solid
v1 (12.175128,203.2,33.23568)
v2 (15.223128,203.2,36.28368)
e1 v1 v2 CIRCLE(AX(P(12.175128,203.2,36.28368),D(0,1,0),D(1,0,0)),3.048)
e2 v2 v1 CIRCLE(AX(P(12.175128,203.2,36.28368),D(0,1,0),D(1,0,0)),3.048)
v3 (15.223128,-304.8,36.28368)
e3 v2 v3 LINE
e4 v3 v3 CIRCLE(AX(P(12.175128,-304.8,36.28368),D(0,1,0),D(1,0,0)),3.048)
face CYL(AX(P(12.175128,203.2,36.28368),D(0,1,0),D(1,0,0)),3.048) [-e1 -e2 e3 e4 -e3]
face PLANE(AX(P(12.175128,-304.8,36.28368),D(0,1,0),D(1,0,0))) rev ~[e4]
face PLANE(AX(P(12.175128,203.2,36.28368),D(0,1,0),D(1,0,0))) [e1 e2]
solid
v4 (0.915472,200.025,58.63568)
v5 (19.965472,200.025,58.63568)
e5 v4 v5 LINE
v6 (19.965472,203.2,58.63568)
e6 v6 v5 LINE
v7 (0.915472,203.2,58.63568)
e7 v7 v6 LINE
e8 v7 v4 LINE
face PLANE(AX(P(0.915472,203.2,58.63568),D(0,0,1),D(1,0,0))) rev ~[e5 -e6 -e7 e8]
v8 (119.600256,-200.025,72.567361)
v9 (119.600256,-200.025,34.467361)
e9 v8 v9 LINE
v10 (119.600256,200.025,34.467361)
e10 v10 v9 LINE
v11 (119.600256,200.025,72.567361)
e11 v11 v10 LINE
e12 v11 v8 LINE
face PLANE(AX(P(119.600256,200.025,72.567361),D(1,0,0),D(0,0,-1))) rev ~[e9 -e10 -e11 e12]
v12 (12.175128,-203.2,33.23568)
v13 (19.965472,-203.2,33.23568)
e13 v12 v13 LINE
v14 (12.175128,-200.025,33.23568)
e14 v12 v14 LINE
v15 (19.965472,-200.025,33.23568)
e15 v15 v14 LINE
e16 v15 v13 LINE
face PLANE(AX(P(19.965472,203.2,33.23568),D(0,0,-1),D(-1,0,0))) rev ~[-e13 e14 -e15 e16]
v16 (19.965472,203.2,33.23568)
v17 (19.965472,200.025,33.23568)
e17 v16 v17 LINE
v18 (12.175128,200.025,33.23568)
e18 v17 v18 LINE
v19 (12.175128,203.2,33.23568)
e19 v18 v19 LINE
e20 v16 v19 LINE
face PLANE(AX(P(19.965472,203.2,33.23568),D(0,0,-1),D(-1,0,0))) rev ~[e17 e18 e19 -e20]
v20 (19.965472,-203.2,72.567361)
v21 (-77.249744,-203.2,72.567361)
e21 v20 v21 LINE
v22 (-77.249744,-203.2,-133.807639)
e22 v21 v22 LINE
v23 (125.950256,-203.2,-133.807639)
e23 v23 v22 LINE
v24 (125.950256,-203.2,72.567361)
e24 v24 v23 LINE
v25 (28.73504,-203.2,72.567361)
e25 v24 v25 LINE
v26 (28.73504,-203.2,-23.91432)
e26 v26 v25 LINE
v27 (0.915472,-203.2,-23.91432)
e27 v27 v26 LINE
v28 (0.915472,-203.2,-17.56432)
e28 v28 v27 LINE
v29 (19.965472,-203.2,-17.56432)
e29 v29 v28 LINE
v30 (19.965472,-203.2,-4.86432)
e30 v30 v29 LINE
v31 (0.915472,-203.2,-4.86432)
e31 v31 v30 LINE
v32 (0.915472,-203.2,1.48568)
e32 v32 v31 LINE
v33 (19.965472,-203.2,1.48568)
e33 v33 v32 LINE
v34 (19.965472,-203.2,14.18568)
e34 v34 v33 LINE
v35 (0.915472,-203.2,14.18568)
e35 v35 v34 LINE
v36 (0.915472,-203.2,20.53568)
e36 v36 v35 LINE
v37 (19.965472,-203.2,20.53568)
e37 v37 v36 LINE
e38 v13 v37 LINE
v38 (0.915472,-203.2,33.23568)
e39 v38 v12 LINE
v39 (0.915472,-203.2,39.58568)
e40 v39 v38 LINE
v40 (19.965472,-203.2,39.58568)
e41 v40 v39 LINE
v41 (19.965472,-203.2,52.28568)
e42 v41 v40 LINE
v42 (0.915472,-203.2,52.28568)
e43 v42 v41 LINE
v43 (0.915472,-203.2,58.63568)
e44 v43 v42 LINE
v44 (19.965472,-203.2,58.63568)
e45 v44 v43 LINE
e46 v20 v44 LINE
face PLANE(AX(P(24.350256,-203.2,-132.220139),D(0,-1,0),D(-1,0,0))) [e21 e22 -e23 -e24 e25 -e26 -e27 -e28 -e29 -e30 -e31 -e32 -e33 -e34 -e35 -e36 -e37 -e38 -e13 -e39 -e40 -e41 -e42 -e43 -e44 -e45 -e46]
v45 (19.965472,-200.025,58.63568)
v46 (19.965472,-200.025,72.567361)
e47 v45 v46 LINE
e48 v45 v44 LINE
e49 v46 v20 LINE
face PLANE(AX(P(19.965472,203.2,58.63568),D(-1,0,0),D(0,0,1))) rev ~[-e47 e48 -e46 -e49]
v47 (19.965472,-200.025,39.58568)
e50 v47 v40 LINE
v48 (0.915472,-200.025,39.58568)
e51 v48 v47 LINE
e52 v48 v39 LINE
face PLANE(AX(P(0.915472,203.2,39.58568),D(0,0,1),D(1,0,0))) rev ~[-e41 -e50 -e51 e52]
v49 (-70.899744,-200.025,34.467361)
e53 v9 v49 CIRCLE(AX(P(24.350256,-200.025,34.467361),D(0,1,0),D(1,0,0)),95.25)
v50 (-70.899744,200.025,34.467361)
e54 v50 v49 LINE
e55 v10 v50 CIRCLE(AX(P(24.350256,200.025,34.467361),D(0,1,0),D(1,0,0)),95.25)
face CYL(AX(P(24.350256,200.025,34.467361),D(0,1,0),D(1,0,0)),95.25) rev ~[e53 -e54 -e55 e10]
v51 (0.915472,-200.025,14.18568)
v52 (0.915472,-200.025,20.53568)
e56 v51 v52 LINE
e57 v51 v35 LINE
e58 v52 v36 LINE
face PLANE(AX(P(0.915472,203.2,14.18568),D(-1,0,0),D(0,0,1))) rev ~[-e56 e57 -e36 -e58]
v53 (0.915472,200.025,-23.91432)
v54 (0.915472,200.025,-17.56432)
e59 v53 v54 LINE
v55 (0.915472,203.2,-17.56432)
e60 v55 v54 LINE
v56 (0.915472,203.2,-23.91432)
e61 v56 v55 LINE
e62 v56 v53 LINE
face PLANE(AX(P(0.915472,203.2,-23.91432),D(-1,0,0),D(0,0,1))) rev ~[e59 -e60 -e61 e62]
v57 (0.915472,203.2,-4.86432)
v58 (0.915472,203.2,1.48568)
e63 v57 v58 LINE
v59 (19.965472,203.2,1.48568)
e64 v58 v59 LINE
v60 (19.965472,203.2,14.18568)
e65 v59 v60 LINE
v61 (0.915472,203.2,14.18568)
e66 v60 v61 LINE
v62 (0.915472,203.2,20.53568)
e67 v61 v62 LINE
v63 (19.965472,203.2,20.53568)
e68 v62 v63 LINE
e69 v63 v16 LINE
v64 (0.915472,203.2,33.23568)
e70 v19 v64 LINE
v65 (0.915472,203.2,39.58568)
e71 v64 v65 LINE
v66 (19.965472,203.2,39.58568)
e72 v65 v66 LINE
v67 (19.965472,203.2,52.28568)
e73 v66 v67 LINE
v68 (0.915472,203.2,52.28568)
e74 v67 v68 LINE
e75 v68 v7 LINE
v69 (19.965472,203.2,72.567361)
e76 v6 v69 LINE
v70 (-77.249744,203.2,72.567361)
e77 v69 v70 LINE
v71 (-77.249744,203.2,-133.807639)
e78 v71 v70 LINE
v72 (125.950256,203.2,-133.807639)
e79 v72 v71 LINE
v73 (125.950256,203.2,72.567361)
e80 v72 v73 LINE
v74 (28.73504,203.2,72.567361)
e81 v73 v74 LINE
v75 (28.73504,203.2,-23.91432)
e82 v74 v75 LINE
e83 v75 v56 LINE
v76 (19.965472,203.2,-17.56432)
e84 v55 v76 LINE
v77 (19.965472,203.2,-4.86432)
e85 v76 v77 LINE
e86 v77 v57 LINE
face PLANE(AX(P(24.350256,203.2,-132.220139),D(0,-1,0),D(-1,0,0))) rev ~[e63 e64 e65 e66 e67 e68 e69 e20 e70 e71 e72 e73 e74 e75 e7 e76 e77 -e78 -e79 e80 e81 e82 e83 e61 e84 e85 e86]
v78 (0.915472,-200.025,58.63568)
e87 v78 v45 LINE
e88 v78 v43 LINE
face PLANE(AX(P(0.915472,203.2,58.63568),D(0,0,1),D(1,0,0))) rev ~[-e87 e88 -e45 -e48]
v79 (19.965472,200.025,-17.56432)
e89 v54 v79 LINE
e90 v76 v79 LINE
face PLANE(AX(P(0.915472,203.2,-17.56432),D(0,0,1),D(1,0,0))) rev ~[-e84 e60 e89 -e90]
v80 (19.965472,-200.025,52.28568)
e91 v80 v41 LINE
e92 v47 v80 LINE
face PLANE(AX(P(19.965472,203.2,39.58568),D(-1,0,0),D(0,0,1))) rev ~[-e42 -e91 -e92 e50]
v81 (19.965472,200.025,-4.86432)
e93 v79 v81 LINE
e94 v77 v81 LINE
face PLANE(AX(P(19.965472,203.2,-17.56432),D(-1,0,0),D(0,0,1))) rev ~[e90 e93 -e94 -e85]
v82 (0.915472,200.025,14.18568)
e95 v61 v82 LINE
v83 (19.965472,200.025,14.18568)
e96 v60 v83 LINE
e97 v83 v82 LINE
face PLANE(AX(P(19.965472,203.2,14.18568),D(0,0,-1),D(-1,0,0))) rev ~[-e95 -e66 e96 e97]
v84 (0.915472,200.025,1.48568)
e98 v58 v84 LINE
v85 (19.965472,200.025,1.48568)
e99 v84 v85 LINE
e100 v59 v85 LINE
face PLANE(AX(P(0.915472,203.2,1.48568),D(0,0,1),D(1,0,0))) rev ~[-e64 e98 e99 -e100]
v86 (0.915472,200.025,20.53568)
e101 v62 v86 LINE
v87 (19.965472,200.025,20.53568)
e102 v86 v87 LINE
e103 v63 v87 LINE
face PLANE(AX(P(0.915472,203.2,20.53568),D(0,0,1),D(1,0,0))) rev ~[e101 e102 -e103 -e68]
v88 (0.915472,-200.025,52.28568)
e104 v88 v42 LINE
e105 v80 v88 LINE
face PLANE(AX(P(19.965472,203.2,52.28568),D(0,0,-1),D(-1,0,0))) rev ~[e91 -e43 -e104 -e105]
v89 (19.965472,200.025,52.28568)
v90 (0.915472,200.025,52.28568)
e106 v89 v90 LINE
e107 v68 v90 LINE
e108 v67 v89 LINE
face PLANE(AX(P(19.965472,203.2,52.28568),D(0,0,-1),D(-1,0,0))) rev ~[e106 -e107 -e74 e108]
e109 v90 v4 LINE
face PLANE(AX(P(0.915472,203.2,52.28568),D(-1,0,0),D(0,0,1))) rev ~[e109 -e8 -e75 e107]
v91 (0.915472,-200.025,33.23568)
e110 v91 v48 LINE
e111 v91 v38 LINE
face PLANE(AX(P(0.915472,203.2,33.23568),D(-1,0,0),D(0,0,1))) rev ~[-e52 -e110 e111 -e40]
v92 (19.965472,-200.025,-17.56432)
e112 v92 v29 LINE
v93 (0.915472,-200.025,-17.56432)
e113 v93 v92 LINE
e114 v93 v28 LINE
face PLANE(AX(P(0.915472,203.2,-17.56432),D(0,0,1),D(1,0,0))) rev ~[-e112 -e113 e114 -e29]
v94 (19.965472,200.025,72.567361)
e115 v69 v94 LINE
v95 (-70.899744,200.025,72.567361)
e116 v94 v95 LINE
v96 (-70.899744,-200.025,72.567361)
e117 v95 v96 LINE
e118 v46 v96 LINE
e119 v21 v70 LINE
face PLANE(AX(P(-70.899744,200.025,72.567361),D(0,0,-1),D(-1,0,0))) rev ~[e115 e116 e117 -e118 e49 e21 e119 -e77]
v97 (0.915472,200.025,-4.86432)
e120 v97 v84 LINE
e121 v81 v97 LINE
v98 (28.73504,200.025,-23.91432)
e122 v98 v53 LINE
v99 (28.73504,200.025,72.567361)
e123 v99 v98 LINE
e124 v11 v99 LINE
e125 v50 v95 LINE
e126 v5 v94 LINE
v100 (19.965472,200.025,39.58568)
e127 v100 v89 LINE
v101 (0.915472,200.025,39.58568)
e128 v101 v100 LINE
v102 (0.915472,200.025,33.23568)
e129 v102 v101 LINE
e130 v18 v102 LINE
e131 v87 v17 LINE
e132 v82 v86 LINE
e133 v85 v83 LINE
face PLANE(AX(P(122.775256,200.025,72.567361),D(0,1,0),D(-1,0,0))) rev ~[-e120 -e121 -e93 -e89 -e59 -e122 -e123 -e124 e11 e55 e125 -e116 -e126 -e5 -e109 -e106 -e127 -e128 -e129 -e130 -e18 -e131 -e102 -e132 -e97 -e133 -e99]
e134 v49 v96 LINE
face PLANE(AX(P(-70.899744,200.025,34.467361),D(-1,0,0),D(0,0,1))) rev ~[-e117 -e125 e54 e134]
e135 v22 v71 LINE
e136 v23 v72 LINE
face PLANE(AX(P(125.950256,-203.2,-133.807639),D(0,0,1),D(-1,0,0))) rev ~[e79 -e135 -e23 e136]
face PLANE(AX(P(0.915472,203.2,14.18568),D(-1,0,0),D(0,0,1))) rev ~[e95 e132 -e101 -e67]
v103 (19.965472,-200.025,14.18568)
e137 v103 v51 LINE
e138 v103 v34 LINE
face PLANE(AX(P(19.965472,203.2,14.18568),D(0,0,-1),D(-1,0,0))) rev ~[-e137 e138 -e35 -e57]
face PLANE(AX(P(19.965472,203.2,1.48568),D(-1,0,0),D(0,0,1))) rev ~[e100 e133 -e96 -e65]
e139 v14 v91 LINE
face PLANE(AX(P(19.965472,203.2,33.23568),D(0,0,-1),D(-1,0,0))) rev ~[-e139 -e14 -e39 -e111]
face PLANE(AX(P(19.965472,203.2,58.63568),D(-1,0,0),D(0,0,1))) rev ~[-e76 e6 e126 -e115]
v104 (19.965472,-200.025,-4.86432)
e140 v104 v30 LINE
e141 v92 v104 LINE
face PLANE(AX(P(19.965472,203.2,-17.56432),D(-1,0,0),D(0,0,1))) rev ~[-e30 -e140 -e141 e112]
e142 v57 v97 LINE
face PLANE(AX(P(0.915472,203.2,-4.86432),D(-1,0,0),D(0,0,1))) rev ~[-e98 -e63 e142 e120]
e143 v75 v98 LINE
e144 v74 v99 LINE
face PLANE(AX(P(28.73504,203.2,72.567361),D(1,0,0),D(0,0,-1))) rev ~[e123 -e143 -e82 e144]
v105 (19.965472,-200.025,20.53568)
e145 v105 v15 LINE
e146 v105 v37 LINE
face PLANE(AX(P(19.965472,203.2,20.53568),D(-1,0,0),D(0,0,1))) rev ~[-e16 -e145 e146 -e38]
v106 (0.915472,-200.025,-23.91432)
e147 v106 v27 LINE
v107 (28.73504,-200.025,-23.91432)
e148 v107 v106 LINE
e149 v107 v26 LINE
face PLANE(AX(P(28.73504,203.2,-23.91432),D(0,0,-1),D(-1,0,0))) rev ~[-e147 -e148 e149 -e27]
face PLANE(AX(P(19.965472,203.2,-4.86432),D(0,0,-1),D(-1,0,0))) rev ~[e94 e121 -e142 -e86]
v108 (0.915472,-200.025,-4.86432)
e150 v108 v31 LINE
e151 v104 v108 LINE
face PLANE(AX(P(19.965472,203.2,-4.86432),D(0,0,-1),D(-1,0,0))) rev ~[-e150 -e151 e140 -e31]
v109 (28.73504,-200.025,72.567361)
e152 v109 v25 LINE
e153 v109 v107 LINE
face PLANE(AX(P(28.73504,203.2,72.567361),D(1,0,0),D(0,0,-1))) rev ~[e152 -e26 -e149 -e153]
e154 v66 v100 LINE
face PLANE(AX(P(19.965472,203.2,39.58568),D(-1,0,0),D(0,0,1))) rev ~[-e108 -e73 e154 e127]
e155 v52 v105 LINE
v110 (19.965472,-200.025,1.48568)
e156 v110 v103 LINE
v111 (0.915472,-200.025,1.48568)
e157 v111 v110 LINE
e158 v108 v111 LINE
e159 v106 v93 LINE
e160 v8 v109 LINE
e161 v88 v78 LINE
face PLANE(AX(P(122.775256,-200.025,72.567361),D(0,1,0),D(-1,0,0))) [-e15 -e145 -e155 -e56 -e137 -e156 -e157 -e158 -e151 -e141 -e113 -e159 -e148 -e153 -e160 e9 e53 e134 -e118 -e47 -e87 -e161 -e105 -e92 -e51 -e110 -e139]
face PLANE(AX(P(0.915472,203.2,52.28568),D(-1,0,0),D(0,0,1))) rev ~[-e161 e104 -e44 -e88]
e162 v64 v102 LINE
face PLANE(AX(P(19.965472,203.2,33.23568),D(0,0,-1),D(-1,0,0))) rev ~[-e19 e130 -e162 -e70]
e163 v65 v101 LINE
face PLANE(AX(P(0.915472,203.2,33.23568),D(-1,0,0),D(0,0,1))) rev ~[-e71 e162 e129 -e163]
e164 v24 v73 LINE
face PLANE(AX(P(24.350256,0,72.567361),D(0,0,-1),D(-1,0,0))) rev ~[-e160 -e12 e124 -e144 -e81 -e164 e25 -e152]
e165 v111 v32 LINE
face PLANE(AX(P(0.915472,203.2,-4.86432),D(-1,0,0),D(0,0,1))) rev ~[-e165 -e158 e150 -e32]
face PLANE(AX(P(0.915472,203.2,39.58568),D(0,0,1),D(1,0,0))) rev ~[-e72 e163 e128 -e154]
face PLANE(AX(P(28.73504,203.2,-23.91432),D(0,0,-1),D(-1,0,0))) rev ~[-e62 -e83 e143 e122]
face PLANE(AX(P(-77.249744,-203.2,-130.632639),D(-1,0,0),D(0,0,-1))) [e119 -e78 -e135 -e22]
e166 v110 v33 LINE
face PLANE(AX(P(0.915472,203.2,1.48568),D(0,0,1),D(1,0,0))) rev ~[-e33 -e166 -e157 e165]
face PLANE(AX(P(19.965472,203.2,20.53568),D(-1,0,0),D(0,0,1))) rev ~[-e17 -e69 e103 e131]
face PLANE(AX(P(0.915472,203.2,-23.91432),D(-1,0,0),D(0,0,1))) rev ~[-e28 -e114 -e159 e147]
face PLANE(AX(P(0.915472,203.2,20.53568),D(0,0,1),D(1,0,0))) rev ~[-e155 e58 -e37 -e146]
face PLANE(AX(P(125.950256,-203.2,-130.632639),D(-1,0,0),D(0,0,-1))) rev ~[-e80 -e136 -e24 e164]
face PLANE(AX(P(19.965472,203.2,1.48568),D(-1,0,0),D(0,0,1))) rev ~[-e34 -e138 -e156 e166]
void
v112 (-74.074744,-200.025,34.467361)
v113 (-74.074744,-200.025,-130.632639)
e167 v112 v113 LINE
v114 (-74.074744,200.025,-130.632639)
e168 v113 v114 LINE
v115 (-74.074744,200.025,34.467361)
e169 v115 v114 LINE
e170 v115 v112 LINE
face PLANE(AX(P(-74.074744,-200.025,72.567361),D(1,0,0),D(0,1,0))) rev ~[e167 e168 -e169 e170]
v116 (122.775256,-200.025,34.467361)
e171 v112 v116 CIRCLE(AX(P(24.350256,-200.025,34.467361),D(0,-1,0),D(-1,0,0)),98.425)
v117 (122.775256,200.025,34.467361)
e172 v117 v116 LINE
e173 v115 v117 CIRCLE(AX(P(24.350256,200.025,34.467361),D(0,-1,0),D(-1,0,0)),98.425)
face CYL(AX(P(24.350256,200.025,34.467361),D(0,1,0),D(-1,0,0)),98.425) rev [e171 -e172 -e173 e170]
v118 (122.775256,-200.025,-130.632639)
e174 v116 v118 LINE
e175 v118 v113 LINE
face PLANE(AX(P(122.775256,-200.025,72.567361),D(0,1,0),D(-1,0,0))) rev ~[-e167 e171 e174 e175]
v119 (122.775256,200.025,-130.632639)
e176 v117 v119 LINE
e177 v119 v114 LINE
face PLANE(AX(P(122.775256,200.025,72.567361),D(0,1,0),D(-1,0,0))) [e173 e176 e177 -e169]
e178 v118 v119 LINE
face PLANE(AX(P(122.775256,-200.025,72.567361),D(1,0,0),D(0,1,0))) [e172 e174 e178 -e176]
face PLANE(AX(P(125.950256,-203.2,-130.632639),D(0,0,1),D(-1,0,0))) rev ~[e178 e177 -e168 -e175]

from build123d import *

# Parameters (mm, degrees)
F0_W      = 203.2
F0_H      = 406.4
F0_W_2    = 196.85
F0_H_2    = 400.05
F1_DEPTH  = 203.2
F2_W      = 203.2
F2_H      = 3.175
F3_DEPTH  = 406.4
F5_DEPTH  = 406.401
F7_DEPTH  = 400.05
F8_R      = 3.048
F9_DEPTH  = 508
F10_ANGLE = 180


# Not quite as in the source:
# - a feature names something its author has since deleted; it is built from what else it names


with BuildPart() as f1:
    # F0 (on Top) → F1 (new body)
    with BuildSketch(Plane.XY):
        Rectangle(F0_W, F0_H)
        Rectangle(F0_W_2, F0_H_2, mode=Mode.SUBTRACT)
    extrude(amount=F1_DEPTH)

    # F2 (on face) → F3 (join)
    with BuildSketch(Plane.XZ.offset(203.2)):
        with Locations((0, 204.7875)):
            Rectangle(F2_W, F2_H)
    extrude(amount=-F3_DEPTH)

    # F4 (on face) → F5 (cut, through all)
    with BuildSketch(Plane(origin=(0, 203.2, 0), x_dir=(-1, 0, 0), z_dir=(0, 1, 0))):
        Polygon((-4.3847840279, 0), (4.3847840279, 0), (4.3847840279, 96.4816804707), (-4.3847840279, 96.4816804707), (-23.4347840279, 96.4816804707), (-23.4347840279, 90.1316804707), (-4.3847840279, 90.1316804707), (-4.3847840279, 77.4316804707), (-23.4347840279, 77.4316804707), (-23.4347840279, 71.0816804707), (-4.3847840279, 71.0816804707), (-4.3847840279, 58.3816804707), (-23.4347840279, 58.3816804707), (-23.4347840279, 52.0316804707), (-4.3847840279, 52.0316804707), (-4.3847840279, 39.3316804707), (-23.4347840279, 39.3316804707), (-23.4347840279, 32.9816804707), (-4.3847840279, 32.9816804707), (-4.3847840279, 20.2816804707), (-23.4347840279, 20.2816804707), (-23.4347840279, 13.9316804707), (-4.3847840279, 13.9316804707), align=None)
    extrude(amount=-F5_DEPTH, mode=Mode.SUBTRACT)

    # F6 (on face) → F7 (join, through all)
    with BuildSketch(Plane.XZ.offset(-200.025)):
        with BuildLine():
            Line((95.25, 0), (98.425, 0))
            Line((98.425, 0), (98.425, 38.1))
            ThreePointArc((98.425, 38.1), (0, 136.525), (-98.425, 38.1))
            Line((-98.425, 38.1), (-98.425, 0))
            Line((-98.425, 0), (-95.25, 0))
            Line((-95.25, 0), (-95.25, 38.1))
            ThreePointArc((-95.25, 38.1), (0, 133.35), (95.25, 38.1))
            Line((95.25, 38.1), (95.25, 0))
        make_face()
    extrude(amount=F7_DEPTH)

    # F8 (on face) → F9 (join)
    with BuildSketch(Plane(origin=(0, 203.2, 0), x_dir=(-1, 0, 0), z_dir=(0, 1, 0))):
        with Locations((-12.1751278639, 36.2836804707)):
            Circle(F8_R)
    extrude(amount=-F9_DEPTH)


with BuildPart() as f1_1:
    # F10: moved
    add(f1.part.rotate(Axis((12.1751278639, 203.2, 36.2836804707), (0, 1, 0)), F10_ANGLE))


solid = f1_1.part
